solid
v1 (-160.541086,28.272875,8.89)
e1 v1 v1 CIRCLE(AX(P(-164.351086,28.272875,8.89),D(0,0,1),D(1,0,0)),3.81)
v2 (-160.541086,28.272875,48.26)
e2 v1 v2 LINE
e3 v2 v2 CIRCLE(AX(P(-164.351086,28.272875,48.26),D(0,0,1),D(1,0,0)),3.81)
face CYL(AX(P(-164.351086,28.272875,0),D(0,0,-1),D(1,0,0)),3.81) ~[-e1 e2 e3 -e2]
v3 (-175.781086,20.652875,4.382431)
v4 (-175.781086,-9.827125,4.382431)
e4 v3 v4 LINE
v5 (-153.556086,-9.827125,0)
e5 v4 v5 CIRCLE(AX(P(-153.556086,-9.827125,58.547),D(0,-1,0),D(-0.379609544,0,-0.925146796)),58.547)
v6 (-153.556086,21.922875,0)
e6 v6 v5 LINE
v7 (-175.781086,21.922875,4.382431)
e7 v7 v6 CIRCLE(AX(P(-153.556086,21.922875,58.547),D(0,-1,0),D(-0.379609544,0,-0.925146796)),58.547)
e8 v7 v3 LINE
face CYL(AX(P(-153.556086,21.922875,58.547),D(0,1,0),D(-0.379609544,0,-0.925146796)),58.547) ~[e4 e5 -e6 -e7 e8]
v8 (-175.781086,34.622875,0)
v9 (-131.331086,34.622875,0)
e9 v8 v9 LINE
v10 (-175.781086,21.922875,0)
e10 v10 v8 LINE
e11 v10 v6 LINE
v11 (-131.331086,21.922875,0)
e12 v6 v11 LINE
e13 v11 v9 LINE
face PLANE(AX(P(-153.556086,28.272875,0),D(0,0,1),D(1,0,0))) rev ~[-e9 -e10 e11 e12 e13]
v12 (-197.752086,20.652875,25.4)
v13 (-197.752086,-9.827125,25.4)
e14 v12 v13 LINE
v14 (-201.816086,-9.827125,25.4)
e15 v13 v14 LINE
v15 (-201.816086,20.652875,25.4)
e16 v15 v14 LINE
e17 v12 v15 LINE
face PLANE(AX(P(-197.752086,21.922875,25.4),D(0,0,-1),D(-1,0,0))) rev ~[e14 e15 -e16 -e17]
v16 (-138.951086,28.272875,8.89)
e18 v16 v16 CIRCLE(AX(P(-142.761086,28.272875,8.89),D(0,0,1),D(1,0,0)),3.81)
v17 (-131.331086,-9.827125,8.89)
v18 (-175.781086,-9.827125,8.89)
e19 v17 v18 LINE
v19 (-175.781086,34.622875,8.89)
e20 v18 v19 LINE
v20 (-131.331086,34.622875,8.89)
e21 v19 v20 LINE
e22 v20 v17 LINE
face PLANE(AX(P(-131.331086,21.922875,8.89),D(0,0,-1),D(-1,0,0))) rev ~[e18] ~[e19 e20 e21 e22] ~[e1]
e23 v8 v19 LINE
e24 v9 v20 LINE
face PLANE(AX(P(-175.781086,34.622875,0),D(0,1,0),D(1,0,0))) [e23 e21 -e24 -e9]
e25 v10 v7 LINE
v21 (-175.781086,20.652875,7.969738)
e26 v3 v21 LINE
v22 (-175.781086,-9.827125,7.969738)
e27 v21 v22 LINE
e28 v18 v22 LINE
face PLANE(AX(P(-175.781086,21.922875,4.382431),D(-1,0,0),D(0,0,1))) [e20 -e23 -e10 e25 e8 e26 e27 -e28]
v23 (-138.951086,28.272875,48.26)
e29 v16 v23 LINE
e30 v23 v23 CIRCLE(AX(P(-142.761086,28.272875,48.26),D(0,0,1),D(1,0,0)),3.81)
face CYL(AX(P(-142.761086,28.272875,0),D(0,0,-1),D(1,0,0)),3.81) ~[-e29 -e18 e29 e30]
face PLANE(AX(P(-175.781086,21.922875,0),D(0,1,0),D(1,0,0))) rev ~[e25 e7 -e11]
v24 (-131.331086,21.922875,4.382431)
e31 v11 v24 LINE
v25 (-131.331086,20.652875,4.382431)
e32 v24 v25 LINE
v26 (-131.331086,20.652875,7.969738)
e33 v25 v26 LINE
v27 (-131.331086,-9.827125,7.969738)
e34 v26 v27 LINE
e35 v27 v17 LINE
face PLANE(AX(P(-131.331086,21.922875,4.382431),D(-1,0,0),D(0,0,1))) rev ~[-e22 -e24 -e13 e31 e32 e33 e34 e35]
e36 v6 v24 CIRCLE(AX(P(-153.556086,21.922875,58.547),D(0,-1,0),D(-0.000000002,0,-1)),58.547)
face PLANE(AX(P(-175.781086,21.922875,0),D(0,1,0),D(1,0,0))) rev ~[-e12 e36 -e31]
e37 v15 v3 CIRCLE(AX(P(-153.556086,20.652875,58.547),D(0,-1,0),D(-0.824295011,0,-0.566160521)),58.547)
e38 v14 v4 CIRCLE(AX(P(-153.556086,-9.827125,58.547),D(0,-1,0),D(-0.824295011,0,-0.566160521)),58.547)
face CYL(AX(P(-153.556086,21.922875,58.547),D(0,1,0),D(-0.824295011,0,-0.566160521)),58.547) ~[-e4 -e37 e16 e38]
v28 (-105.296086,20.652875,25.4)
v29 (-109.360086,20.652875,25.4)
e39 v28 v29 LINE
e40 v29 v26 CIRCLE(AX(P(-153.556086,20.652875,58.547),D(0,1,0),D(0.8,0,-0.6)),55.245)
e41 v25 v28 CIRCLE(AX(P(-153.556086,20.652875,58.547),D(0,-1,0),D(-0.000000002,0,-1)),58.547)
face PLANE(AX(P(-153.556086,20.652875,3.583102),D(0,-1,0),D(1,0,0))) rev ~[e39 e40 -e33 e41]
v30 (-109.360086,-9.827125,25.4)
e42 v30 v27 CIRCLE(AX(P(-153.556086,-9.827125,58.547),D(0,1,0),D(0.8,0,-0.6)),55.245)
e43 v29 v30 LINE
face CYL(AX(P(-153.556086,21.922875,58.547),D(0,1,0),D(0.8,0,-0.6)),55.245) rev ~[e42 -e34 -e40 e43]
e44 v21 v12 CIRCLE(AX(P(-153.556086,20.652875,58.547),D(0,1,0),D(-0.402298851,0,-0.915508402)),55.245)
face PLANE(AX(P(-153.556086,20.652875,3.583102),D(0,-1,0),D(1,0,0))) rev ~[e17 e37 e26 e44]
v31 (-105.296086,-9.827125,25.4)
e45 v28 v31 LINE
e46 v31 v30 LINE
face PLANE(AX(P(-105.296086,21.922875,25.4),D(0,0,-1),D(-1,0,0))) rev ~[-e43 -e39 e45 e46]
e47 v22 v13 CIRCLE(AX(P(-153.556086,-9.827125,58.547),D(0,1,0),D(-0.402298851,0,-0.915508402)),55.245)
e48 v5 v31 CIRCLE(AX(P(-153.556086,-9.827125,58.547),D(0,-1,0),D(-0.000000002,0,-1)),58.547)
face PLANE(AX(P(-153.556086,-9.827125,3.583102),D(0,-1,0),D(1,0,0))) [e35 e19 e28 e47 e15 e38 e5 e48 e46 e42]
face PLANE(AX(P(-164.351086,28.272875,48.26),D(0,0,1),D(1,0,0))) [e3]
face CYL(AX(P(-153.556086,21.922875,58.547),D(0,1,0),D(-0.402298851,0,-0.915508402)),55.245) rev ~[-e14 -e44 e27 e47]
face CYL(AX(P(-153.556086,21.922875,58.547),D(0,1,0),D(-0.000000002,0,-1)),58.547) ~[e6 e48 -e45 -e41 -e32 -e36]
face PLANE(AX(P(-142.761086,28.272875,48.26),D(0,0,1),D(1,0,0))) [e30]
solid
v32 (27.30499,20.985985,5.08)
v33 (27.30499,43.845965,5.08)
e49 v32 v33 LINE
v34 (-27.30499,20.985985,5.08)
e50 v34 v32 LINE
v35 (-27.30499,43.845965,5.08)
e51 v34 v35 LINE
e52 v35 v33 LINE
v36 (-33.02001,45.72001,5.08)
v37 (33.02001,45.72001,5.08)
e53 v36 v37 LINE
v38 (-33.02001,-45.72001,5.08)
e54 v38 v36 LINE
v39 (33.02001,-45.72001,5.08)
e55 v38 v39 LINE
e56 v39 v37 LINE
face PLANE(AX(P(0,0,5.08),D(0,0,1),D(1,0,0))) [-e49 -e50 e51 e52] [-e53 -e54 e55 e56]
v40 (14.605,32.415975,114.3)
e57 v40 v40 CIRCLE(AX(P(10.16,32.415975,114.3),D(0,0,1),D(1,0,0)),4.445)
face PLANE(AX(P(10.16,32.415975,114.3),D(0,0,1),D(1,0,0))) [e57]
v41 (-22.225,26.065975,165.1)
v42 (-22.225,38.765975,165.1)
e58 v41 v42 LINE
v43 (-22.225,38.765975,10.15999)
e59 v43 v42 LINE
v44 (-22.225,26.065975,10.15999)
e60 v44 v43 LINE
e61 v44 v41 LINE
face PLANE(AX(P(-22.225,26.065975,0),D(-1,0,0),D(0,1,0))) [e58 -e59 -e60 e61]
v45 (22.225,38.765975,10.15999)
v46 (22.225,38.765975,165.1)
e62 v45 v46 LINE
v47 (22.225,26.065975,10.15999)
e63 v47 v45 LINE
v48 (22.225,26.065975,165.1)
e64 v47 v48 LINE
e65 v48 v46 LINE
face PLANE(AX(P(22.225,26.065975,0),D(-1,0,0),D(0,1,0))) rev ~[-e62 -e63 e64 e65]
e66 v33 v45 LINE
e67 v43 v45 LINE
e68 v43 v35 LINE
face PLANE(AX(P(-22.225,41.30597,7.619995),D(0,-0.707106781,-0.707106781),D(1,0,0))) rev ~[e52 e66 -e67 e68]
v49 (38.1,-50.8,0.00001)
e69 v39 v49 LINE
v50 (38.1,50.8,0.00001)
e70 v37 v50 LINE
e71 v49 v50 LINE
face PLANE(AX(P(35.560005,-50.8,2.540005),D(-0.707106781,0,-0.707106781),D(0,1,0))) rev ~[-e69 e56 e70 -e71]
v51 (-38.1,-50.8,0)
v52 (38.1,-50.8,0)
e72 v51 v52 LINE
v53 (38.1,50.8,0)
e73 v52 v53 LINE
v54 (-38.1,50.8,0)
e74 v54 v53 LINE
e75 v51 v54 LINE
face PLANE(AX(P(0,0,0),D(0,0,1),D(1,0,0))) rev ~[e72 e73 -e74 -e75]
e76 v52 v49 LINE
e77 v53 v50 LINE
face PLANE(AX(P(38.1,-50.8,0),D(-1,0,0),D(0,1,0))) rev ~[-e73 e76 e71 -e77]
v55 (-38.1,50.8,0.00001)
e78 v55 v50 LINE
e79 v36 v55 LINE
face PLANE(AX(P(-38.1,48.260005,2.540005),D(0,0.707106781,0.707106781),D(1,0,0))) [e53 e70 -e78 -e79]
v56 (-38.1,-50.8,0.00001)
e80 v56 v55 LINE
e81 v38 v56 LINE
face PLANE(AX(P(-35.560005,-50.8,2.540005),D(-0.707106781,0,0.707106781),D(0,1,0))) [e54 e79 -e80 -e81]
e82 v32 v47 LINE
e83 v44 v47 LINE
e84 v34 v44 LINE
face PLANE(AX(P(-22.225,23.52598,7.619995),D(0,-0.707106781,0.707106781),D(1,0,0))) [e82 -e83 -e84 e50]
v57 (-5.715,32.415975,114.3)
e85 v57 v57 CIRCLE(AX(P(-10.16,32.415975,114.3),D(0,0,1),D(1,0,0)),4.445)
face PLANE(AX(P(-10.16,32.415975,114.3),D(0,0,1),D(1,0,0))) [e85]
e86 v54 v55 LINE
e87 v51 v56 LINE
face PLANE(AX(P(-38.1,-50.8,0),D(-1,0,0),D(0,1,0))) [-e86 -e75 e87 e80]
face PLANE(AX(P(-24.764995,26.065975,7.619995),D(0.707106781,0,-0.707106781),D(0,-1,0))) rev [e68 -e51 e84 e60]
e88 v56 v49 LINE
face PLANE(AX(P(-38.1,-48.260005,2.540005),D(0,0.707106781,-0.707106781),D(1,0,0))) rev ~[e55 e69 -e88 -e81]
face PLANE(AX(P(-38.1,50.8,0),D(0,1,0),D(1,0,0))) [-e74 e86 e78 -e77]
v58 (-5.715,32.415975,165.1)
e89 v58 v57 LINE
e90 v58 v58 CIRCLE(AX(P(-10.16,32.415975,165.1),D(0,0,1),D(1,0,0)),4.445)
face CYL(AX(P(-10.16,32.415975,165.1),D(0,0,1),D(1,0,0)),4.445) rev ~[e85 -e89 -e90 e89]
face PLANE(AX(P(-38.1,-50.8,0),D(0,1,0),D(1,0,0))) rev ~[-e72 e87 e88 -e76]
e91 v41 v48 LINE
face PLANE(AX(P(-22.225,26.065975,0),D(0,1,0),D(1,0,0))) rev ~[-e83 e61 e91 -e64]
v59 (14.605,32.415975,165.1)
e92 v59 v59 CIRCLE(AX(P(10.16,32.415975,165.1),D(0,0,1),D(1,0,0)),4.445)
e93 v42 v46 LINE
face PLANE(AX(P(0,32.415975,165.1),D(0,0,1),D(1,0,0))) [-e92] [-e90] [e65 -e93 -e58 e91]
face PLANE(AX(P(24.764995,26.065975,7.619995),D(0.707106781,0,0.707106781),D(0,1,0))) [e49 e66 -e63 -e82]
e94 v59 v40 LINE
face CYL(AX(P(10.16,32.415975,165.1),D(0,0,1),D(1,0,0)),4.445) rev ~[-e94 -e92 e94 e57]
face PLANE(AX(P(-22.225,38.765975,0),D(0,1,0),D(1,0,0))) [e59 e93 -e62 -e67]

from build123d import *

# Parameters (mm, degrees)
F0_W      = 76.2
F0_H      = 101.6
F0_W_2    = 44.45
F0_H_2    = 12.7
F1_DEPTH  = 5.08
F2_DEPTH  = 165.1
F3_R      = 4.445
F4_DEPTH  = 50.8
F5_W      = 44.45
F5_H      = 12.7
F5_R      = 3.81
F6_DEPTH  = 8.89
F7_DEPTH  = 48.26
F9_DEPTH  = 31.75
F10_DEPTH = 1.27
F11_SIZE  = 5.07999


# Not quite as in the source:
# - a fillet or chamfer is up to 0.001 mm smaller than in the source, because OpenCascade refuses the exact size


with BuildPart() as f1:
    # F0 (on Top) → F1 (new body)
    with BuildSketch(Plane.XY):
        Rectangle(F0_W, F0_H)
        with Locations((0, 32.4159748852)):
            Rectangle(F0_W_2, F0_H_2, mode=Mode.SUBTRACT)
    extrude(amount=F1_DEPTH)

    # F0 (on Top) → F2 (join)
    with BuildSketch(Plane.XY):
        with Locations((0, 32.4159748852)):
            Rectangle(F0_W_2, F0_H_2)
    extrude(amount=F2_DEPTH)

    # F3 (on face) → F4 (cut)
    with BuildSketch(Plane.XY.offset(165.1)):
        with Locations((-10.16, 32.4159748852)):
            Circle(F3_R)
        with Locations((10.16, 32.4159748852)):
            Circle(F3_R)
    extrude(amount=-F4_DEPTH, mode=Mode.SUBTRACT)

    # F11 (size 5.08 in the source; OpenCascade refuses exactly that, so slightly less here)
    f11_edges = [f1.edges().sort_by_distance(p)[0] for p in [
        (38.1, 0, 5.08),
        (0, 50.8, 5.08),
        (-38.1, 0, 5.08),
        (0, -50.8, 5.08),
        (22.225, 32.415975, 5.08),
        (0, 26.065975, 5.08),
        (-22.225, 32.415975, 5.08),
        (0, 38.765975, 5.08),
    ]]
    chamfer(f11_edges, length=F11_SIZE)


with BuildPart() as f6:
    # F5 (on Top) → F6 (new body)
    with BuildSketch(Plane.XY):
        with Locations((-153.5560860872, 28.2728751957)):
            Rectangle(F5_W, F5_H)
        with Locations((-164.3510860872, 28.2728751957)):
            Circle(F5_R, mode=Mode.SUBTRACT)
        with Locations((-142.7610860872, 28.2728751957)):
            Circle(F5_R, mode=Mode.SUBTRACT)
    extrude(amount=F6_DEPTH)

    # F5 (on Top) → F7 (join)
    with BuildSketch(Plane.XY):
        with Locations((-164.3510860872, 28.2728751957)):
            Circle(F5_R)
        with Locations((-142.7610860872, 28.2728751957)):
            Circle(F5_R)
    extrude(amount=F7_DEPTH)

    # F8 (on face) → F9 (join)
    with BuildSketch(Plane.XZ.offset(-21.9228751957)):
        with BuildLine():
            Line((-175.7810860872, 7.9697383106), (-175.7810860872, 4.3824305473))
            ThreePointArc((-175.7810860872, 4.3824305473), (-164.8825631117, 1.1060553071), (-153.5560861917, 0))
            ThreePointArc((-153.5560861917, 0), (-142.2296091652, 1.1060552869), (-131.3310860872, 4.3824305473))
            Line((-131.3310860872, 4.3824305473), (-131.3310860872, 7.9697383106))
            ThreePointArc((-131.3310860872, 7.9697383106), (-153.5560860872, 3.302), (-175.7810860872, 7.9697383106))
        make_face()
        with BuildLine():
            Line((-105.2960860872, 25.4), (-109.3600860872, 25.4))
            ThreePointArc((-109.3600860872, 25.4), (-119.2211066073, 15.2674527622), (-131.3310860872, 7.9697383106))
            Line((-131.3310860872, 7.9697383106), (-131.3310860872, 4.3824305473))
            ThreePointArc((-131.3310860872, 4.3824305473), (-116.7801651243, 12.9917275683), (-105.2960860872, 25.4))
        make_face()
        with BuildLine():
            Line((-197.7520860872, 25.4), (-201.8160860872, 25.4))
            ThreePointArc((-201.8160860872, 25.4), (-190.3320070502, 12.9917275683), (-175.7810860872, 4.3824305473))
            Line((-175.7810860872, 4.3824305473), (-175.7810860872, 7.9697383106))
            ThreePointArc((-175.7810860872, 7.9697383106), (-187.8910655672, 15.2674527622), (-197.7520860872, 25.4))
        make_face()
        with BuildLine():
            Line((-175.7810860872, 8.89), (-175.7810860872, 7.9697383106))
            ThreePointArc((-175.7810860872, 7.9697383106), (-153.5560860872, 3.302), (-131.3310860872, 7.9697383106))
            Line((-131.3310860872, 7.9697383106), (-131.3310860872, 8.89))
            Line((-131.3310860872, 8.89), (-175.7810860872, 8.89))
        make_face()
    extrude(amount=F9_DEPTH)

    # F10 (cut): faces of the model
    f10_faces = [f6.faces().sort_by_distance(p)[0] for p in [
        (-118.407316074, 21.9228751957, 14.6525302176),
        (-188.7048561005, 21.9228751957, 14.6525302176),
    ]]
    extrude(f10_faces, amount=-F10_DEPTH, mode=Mode.SUBTRACT)


solid = Compound([f1.part, f6.part])
